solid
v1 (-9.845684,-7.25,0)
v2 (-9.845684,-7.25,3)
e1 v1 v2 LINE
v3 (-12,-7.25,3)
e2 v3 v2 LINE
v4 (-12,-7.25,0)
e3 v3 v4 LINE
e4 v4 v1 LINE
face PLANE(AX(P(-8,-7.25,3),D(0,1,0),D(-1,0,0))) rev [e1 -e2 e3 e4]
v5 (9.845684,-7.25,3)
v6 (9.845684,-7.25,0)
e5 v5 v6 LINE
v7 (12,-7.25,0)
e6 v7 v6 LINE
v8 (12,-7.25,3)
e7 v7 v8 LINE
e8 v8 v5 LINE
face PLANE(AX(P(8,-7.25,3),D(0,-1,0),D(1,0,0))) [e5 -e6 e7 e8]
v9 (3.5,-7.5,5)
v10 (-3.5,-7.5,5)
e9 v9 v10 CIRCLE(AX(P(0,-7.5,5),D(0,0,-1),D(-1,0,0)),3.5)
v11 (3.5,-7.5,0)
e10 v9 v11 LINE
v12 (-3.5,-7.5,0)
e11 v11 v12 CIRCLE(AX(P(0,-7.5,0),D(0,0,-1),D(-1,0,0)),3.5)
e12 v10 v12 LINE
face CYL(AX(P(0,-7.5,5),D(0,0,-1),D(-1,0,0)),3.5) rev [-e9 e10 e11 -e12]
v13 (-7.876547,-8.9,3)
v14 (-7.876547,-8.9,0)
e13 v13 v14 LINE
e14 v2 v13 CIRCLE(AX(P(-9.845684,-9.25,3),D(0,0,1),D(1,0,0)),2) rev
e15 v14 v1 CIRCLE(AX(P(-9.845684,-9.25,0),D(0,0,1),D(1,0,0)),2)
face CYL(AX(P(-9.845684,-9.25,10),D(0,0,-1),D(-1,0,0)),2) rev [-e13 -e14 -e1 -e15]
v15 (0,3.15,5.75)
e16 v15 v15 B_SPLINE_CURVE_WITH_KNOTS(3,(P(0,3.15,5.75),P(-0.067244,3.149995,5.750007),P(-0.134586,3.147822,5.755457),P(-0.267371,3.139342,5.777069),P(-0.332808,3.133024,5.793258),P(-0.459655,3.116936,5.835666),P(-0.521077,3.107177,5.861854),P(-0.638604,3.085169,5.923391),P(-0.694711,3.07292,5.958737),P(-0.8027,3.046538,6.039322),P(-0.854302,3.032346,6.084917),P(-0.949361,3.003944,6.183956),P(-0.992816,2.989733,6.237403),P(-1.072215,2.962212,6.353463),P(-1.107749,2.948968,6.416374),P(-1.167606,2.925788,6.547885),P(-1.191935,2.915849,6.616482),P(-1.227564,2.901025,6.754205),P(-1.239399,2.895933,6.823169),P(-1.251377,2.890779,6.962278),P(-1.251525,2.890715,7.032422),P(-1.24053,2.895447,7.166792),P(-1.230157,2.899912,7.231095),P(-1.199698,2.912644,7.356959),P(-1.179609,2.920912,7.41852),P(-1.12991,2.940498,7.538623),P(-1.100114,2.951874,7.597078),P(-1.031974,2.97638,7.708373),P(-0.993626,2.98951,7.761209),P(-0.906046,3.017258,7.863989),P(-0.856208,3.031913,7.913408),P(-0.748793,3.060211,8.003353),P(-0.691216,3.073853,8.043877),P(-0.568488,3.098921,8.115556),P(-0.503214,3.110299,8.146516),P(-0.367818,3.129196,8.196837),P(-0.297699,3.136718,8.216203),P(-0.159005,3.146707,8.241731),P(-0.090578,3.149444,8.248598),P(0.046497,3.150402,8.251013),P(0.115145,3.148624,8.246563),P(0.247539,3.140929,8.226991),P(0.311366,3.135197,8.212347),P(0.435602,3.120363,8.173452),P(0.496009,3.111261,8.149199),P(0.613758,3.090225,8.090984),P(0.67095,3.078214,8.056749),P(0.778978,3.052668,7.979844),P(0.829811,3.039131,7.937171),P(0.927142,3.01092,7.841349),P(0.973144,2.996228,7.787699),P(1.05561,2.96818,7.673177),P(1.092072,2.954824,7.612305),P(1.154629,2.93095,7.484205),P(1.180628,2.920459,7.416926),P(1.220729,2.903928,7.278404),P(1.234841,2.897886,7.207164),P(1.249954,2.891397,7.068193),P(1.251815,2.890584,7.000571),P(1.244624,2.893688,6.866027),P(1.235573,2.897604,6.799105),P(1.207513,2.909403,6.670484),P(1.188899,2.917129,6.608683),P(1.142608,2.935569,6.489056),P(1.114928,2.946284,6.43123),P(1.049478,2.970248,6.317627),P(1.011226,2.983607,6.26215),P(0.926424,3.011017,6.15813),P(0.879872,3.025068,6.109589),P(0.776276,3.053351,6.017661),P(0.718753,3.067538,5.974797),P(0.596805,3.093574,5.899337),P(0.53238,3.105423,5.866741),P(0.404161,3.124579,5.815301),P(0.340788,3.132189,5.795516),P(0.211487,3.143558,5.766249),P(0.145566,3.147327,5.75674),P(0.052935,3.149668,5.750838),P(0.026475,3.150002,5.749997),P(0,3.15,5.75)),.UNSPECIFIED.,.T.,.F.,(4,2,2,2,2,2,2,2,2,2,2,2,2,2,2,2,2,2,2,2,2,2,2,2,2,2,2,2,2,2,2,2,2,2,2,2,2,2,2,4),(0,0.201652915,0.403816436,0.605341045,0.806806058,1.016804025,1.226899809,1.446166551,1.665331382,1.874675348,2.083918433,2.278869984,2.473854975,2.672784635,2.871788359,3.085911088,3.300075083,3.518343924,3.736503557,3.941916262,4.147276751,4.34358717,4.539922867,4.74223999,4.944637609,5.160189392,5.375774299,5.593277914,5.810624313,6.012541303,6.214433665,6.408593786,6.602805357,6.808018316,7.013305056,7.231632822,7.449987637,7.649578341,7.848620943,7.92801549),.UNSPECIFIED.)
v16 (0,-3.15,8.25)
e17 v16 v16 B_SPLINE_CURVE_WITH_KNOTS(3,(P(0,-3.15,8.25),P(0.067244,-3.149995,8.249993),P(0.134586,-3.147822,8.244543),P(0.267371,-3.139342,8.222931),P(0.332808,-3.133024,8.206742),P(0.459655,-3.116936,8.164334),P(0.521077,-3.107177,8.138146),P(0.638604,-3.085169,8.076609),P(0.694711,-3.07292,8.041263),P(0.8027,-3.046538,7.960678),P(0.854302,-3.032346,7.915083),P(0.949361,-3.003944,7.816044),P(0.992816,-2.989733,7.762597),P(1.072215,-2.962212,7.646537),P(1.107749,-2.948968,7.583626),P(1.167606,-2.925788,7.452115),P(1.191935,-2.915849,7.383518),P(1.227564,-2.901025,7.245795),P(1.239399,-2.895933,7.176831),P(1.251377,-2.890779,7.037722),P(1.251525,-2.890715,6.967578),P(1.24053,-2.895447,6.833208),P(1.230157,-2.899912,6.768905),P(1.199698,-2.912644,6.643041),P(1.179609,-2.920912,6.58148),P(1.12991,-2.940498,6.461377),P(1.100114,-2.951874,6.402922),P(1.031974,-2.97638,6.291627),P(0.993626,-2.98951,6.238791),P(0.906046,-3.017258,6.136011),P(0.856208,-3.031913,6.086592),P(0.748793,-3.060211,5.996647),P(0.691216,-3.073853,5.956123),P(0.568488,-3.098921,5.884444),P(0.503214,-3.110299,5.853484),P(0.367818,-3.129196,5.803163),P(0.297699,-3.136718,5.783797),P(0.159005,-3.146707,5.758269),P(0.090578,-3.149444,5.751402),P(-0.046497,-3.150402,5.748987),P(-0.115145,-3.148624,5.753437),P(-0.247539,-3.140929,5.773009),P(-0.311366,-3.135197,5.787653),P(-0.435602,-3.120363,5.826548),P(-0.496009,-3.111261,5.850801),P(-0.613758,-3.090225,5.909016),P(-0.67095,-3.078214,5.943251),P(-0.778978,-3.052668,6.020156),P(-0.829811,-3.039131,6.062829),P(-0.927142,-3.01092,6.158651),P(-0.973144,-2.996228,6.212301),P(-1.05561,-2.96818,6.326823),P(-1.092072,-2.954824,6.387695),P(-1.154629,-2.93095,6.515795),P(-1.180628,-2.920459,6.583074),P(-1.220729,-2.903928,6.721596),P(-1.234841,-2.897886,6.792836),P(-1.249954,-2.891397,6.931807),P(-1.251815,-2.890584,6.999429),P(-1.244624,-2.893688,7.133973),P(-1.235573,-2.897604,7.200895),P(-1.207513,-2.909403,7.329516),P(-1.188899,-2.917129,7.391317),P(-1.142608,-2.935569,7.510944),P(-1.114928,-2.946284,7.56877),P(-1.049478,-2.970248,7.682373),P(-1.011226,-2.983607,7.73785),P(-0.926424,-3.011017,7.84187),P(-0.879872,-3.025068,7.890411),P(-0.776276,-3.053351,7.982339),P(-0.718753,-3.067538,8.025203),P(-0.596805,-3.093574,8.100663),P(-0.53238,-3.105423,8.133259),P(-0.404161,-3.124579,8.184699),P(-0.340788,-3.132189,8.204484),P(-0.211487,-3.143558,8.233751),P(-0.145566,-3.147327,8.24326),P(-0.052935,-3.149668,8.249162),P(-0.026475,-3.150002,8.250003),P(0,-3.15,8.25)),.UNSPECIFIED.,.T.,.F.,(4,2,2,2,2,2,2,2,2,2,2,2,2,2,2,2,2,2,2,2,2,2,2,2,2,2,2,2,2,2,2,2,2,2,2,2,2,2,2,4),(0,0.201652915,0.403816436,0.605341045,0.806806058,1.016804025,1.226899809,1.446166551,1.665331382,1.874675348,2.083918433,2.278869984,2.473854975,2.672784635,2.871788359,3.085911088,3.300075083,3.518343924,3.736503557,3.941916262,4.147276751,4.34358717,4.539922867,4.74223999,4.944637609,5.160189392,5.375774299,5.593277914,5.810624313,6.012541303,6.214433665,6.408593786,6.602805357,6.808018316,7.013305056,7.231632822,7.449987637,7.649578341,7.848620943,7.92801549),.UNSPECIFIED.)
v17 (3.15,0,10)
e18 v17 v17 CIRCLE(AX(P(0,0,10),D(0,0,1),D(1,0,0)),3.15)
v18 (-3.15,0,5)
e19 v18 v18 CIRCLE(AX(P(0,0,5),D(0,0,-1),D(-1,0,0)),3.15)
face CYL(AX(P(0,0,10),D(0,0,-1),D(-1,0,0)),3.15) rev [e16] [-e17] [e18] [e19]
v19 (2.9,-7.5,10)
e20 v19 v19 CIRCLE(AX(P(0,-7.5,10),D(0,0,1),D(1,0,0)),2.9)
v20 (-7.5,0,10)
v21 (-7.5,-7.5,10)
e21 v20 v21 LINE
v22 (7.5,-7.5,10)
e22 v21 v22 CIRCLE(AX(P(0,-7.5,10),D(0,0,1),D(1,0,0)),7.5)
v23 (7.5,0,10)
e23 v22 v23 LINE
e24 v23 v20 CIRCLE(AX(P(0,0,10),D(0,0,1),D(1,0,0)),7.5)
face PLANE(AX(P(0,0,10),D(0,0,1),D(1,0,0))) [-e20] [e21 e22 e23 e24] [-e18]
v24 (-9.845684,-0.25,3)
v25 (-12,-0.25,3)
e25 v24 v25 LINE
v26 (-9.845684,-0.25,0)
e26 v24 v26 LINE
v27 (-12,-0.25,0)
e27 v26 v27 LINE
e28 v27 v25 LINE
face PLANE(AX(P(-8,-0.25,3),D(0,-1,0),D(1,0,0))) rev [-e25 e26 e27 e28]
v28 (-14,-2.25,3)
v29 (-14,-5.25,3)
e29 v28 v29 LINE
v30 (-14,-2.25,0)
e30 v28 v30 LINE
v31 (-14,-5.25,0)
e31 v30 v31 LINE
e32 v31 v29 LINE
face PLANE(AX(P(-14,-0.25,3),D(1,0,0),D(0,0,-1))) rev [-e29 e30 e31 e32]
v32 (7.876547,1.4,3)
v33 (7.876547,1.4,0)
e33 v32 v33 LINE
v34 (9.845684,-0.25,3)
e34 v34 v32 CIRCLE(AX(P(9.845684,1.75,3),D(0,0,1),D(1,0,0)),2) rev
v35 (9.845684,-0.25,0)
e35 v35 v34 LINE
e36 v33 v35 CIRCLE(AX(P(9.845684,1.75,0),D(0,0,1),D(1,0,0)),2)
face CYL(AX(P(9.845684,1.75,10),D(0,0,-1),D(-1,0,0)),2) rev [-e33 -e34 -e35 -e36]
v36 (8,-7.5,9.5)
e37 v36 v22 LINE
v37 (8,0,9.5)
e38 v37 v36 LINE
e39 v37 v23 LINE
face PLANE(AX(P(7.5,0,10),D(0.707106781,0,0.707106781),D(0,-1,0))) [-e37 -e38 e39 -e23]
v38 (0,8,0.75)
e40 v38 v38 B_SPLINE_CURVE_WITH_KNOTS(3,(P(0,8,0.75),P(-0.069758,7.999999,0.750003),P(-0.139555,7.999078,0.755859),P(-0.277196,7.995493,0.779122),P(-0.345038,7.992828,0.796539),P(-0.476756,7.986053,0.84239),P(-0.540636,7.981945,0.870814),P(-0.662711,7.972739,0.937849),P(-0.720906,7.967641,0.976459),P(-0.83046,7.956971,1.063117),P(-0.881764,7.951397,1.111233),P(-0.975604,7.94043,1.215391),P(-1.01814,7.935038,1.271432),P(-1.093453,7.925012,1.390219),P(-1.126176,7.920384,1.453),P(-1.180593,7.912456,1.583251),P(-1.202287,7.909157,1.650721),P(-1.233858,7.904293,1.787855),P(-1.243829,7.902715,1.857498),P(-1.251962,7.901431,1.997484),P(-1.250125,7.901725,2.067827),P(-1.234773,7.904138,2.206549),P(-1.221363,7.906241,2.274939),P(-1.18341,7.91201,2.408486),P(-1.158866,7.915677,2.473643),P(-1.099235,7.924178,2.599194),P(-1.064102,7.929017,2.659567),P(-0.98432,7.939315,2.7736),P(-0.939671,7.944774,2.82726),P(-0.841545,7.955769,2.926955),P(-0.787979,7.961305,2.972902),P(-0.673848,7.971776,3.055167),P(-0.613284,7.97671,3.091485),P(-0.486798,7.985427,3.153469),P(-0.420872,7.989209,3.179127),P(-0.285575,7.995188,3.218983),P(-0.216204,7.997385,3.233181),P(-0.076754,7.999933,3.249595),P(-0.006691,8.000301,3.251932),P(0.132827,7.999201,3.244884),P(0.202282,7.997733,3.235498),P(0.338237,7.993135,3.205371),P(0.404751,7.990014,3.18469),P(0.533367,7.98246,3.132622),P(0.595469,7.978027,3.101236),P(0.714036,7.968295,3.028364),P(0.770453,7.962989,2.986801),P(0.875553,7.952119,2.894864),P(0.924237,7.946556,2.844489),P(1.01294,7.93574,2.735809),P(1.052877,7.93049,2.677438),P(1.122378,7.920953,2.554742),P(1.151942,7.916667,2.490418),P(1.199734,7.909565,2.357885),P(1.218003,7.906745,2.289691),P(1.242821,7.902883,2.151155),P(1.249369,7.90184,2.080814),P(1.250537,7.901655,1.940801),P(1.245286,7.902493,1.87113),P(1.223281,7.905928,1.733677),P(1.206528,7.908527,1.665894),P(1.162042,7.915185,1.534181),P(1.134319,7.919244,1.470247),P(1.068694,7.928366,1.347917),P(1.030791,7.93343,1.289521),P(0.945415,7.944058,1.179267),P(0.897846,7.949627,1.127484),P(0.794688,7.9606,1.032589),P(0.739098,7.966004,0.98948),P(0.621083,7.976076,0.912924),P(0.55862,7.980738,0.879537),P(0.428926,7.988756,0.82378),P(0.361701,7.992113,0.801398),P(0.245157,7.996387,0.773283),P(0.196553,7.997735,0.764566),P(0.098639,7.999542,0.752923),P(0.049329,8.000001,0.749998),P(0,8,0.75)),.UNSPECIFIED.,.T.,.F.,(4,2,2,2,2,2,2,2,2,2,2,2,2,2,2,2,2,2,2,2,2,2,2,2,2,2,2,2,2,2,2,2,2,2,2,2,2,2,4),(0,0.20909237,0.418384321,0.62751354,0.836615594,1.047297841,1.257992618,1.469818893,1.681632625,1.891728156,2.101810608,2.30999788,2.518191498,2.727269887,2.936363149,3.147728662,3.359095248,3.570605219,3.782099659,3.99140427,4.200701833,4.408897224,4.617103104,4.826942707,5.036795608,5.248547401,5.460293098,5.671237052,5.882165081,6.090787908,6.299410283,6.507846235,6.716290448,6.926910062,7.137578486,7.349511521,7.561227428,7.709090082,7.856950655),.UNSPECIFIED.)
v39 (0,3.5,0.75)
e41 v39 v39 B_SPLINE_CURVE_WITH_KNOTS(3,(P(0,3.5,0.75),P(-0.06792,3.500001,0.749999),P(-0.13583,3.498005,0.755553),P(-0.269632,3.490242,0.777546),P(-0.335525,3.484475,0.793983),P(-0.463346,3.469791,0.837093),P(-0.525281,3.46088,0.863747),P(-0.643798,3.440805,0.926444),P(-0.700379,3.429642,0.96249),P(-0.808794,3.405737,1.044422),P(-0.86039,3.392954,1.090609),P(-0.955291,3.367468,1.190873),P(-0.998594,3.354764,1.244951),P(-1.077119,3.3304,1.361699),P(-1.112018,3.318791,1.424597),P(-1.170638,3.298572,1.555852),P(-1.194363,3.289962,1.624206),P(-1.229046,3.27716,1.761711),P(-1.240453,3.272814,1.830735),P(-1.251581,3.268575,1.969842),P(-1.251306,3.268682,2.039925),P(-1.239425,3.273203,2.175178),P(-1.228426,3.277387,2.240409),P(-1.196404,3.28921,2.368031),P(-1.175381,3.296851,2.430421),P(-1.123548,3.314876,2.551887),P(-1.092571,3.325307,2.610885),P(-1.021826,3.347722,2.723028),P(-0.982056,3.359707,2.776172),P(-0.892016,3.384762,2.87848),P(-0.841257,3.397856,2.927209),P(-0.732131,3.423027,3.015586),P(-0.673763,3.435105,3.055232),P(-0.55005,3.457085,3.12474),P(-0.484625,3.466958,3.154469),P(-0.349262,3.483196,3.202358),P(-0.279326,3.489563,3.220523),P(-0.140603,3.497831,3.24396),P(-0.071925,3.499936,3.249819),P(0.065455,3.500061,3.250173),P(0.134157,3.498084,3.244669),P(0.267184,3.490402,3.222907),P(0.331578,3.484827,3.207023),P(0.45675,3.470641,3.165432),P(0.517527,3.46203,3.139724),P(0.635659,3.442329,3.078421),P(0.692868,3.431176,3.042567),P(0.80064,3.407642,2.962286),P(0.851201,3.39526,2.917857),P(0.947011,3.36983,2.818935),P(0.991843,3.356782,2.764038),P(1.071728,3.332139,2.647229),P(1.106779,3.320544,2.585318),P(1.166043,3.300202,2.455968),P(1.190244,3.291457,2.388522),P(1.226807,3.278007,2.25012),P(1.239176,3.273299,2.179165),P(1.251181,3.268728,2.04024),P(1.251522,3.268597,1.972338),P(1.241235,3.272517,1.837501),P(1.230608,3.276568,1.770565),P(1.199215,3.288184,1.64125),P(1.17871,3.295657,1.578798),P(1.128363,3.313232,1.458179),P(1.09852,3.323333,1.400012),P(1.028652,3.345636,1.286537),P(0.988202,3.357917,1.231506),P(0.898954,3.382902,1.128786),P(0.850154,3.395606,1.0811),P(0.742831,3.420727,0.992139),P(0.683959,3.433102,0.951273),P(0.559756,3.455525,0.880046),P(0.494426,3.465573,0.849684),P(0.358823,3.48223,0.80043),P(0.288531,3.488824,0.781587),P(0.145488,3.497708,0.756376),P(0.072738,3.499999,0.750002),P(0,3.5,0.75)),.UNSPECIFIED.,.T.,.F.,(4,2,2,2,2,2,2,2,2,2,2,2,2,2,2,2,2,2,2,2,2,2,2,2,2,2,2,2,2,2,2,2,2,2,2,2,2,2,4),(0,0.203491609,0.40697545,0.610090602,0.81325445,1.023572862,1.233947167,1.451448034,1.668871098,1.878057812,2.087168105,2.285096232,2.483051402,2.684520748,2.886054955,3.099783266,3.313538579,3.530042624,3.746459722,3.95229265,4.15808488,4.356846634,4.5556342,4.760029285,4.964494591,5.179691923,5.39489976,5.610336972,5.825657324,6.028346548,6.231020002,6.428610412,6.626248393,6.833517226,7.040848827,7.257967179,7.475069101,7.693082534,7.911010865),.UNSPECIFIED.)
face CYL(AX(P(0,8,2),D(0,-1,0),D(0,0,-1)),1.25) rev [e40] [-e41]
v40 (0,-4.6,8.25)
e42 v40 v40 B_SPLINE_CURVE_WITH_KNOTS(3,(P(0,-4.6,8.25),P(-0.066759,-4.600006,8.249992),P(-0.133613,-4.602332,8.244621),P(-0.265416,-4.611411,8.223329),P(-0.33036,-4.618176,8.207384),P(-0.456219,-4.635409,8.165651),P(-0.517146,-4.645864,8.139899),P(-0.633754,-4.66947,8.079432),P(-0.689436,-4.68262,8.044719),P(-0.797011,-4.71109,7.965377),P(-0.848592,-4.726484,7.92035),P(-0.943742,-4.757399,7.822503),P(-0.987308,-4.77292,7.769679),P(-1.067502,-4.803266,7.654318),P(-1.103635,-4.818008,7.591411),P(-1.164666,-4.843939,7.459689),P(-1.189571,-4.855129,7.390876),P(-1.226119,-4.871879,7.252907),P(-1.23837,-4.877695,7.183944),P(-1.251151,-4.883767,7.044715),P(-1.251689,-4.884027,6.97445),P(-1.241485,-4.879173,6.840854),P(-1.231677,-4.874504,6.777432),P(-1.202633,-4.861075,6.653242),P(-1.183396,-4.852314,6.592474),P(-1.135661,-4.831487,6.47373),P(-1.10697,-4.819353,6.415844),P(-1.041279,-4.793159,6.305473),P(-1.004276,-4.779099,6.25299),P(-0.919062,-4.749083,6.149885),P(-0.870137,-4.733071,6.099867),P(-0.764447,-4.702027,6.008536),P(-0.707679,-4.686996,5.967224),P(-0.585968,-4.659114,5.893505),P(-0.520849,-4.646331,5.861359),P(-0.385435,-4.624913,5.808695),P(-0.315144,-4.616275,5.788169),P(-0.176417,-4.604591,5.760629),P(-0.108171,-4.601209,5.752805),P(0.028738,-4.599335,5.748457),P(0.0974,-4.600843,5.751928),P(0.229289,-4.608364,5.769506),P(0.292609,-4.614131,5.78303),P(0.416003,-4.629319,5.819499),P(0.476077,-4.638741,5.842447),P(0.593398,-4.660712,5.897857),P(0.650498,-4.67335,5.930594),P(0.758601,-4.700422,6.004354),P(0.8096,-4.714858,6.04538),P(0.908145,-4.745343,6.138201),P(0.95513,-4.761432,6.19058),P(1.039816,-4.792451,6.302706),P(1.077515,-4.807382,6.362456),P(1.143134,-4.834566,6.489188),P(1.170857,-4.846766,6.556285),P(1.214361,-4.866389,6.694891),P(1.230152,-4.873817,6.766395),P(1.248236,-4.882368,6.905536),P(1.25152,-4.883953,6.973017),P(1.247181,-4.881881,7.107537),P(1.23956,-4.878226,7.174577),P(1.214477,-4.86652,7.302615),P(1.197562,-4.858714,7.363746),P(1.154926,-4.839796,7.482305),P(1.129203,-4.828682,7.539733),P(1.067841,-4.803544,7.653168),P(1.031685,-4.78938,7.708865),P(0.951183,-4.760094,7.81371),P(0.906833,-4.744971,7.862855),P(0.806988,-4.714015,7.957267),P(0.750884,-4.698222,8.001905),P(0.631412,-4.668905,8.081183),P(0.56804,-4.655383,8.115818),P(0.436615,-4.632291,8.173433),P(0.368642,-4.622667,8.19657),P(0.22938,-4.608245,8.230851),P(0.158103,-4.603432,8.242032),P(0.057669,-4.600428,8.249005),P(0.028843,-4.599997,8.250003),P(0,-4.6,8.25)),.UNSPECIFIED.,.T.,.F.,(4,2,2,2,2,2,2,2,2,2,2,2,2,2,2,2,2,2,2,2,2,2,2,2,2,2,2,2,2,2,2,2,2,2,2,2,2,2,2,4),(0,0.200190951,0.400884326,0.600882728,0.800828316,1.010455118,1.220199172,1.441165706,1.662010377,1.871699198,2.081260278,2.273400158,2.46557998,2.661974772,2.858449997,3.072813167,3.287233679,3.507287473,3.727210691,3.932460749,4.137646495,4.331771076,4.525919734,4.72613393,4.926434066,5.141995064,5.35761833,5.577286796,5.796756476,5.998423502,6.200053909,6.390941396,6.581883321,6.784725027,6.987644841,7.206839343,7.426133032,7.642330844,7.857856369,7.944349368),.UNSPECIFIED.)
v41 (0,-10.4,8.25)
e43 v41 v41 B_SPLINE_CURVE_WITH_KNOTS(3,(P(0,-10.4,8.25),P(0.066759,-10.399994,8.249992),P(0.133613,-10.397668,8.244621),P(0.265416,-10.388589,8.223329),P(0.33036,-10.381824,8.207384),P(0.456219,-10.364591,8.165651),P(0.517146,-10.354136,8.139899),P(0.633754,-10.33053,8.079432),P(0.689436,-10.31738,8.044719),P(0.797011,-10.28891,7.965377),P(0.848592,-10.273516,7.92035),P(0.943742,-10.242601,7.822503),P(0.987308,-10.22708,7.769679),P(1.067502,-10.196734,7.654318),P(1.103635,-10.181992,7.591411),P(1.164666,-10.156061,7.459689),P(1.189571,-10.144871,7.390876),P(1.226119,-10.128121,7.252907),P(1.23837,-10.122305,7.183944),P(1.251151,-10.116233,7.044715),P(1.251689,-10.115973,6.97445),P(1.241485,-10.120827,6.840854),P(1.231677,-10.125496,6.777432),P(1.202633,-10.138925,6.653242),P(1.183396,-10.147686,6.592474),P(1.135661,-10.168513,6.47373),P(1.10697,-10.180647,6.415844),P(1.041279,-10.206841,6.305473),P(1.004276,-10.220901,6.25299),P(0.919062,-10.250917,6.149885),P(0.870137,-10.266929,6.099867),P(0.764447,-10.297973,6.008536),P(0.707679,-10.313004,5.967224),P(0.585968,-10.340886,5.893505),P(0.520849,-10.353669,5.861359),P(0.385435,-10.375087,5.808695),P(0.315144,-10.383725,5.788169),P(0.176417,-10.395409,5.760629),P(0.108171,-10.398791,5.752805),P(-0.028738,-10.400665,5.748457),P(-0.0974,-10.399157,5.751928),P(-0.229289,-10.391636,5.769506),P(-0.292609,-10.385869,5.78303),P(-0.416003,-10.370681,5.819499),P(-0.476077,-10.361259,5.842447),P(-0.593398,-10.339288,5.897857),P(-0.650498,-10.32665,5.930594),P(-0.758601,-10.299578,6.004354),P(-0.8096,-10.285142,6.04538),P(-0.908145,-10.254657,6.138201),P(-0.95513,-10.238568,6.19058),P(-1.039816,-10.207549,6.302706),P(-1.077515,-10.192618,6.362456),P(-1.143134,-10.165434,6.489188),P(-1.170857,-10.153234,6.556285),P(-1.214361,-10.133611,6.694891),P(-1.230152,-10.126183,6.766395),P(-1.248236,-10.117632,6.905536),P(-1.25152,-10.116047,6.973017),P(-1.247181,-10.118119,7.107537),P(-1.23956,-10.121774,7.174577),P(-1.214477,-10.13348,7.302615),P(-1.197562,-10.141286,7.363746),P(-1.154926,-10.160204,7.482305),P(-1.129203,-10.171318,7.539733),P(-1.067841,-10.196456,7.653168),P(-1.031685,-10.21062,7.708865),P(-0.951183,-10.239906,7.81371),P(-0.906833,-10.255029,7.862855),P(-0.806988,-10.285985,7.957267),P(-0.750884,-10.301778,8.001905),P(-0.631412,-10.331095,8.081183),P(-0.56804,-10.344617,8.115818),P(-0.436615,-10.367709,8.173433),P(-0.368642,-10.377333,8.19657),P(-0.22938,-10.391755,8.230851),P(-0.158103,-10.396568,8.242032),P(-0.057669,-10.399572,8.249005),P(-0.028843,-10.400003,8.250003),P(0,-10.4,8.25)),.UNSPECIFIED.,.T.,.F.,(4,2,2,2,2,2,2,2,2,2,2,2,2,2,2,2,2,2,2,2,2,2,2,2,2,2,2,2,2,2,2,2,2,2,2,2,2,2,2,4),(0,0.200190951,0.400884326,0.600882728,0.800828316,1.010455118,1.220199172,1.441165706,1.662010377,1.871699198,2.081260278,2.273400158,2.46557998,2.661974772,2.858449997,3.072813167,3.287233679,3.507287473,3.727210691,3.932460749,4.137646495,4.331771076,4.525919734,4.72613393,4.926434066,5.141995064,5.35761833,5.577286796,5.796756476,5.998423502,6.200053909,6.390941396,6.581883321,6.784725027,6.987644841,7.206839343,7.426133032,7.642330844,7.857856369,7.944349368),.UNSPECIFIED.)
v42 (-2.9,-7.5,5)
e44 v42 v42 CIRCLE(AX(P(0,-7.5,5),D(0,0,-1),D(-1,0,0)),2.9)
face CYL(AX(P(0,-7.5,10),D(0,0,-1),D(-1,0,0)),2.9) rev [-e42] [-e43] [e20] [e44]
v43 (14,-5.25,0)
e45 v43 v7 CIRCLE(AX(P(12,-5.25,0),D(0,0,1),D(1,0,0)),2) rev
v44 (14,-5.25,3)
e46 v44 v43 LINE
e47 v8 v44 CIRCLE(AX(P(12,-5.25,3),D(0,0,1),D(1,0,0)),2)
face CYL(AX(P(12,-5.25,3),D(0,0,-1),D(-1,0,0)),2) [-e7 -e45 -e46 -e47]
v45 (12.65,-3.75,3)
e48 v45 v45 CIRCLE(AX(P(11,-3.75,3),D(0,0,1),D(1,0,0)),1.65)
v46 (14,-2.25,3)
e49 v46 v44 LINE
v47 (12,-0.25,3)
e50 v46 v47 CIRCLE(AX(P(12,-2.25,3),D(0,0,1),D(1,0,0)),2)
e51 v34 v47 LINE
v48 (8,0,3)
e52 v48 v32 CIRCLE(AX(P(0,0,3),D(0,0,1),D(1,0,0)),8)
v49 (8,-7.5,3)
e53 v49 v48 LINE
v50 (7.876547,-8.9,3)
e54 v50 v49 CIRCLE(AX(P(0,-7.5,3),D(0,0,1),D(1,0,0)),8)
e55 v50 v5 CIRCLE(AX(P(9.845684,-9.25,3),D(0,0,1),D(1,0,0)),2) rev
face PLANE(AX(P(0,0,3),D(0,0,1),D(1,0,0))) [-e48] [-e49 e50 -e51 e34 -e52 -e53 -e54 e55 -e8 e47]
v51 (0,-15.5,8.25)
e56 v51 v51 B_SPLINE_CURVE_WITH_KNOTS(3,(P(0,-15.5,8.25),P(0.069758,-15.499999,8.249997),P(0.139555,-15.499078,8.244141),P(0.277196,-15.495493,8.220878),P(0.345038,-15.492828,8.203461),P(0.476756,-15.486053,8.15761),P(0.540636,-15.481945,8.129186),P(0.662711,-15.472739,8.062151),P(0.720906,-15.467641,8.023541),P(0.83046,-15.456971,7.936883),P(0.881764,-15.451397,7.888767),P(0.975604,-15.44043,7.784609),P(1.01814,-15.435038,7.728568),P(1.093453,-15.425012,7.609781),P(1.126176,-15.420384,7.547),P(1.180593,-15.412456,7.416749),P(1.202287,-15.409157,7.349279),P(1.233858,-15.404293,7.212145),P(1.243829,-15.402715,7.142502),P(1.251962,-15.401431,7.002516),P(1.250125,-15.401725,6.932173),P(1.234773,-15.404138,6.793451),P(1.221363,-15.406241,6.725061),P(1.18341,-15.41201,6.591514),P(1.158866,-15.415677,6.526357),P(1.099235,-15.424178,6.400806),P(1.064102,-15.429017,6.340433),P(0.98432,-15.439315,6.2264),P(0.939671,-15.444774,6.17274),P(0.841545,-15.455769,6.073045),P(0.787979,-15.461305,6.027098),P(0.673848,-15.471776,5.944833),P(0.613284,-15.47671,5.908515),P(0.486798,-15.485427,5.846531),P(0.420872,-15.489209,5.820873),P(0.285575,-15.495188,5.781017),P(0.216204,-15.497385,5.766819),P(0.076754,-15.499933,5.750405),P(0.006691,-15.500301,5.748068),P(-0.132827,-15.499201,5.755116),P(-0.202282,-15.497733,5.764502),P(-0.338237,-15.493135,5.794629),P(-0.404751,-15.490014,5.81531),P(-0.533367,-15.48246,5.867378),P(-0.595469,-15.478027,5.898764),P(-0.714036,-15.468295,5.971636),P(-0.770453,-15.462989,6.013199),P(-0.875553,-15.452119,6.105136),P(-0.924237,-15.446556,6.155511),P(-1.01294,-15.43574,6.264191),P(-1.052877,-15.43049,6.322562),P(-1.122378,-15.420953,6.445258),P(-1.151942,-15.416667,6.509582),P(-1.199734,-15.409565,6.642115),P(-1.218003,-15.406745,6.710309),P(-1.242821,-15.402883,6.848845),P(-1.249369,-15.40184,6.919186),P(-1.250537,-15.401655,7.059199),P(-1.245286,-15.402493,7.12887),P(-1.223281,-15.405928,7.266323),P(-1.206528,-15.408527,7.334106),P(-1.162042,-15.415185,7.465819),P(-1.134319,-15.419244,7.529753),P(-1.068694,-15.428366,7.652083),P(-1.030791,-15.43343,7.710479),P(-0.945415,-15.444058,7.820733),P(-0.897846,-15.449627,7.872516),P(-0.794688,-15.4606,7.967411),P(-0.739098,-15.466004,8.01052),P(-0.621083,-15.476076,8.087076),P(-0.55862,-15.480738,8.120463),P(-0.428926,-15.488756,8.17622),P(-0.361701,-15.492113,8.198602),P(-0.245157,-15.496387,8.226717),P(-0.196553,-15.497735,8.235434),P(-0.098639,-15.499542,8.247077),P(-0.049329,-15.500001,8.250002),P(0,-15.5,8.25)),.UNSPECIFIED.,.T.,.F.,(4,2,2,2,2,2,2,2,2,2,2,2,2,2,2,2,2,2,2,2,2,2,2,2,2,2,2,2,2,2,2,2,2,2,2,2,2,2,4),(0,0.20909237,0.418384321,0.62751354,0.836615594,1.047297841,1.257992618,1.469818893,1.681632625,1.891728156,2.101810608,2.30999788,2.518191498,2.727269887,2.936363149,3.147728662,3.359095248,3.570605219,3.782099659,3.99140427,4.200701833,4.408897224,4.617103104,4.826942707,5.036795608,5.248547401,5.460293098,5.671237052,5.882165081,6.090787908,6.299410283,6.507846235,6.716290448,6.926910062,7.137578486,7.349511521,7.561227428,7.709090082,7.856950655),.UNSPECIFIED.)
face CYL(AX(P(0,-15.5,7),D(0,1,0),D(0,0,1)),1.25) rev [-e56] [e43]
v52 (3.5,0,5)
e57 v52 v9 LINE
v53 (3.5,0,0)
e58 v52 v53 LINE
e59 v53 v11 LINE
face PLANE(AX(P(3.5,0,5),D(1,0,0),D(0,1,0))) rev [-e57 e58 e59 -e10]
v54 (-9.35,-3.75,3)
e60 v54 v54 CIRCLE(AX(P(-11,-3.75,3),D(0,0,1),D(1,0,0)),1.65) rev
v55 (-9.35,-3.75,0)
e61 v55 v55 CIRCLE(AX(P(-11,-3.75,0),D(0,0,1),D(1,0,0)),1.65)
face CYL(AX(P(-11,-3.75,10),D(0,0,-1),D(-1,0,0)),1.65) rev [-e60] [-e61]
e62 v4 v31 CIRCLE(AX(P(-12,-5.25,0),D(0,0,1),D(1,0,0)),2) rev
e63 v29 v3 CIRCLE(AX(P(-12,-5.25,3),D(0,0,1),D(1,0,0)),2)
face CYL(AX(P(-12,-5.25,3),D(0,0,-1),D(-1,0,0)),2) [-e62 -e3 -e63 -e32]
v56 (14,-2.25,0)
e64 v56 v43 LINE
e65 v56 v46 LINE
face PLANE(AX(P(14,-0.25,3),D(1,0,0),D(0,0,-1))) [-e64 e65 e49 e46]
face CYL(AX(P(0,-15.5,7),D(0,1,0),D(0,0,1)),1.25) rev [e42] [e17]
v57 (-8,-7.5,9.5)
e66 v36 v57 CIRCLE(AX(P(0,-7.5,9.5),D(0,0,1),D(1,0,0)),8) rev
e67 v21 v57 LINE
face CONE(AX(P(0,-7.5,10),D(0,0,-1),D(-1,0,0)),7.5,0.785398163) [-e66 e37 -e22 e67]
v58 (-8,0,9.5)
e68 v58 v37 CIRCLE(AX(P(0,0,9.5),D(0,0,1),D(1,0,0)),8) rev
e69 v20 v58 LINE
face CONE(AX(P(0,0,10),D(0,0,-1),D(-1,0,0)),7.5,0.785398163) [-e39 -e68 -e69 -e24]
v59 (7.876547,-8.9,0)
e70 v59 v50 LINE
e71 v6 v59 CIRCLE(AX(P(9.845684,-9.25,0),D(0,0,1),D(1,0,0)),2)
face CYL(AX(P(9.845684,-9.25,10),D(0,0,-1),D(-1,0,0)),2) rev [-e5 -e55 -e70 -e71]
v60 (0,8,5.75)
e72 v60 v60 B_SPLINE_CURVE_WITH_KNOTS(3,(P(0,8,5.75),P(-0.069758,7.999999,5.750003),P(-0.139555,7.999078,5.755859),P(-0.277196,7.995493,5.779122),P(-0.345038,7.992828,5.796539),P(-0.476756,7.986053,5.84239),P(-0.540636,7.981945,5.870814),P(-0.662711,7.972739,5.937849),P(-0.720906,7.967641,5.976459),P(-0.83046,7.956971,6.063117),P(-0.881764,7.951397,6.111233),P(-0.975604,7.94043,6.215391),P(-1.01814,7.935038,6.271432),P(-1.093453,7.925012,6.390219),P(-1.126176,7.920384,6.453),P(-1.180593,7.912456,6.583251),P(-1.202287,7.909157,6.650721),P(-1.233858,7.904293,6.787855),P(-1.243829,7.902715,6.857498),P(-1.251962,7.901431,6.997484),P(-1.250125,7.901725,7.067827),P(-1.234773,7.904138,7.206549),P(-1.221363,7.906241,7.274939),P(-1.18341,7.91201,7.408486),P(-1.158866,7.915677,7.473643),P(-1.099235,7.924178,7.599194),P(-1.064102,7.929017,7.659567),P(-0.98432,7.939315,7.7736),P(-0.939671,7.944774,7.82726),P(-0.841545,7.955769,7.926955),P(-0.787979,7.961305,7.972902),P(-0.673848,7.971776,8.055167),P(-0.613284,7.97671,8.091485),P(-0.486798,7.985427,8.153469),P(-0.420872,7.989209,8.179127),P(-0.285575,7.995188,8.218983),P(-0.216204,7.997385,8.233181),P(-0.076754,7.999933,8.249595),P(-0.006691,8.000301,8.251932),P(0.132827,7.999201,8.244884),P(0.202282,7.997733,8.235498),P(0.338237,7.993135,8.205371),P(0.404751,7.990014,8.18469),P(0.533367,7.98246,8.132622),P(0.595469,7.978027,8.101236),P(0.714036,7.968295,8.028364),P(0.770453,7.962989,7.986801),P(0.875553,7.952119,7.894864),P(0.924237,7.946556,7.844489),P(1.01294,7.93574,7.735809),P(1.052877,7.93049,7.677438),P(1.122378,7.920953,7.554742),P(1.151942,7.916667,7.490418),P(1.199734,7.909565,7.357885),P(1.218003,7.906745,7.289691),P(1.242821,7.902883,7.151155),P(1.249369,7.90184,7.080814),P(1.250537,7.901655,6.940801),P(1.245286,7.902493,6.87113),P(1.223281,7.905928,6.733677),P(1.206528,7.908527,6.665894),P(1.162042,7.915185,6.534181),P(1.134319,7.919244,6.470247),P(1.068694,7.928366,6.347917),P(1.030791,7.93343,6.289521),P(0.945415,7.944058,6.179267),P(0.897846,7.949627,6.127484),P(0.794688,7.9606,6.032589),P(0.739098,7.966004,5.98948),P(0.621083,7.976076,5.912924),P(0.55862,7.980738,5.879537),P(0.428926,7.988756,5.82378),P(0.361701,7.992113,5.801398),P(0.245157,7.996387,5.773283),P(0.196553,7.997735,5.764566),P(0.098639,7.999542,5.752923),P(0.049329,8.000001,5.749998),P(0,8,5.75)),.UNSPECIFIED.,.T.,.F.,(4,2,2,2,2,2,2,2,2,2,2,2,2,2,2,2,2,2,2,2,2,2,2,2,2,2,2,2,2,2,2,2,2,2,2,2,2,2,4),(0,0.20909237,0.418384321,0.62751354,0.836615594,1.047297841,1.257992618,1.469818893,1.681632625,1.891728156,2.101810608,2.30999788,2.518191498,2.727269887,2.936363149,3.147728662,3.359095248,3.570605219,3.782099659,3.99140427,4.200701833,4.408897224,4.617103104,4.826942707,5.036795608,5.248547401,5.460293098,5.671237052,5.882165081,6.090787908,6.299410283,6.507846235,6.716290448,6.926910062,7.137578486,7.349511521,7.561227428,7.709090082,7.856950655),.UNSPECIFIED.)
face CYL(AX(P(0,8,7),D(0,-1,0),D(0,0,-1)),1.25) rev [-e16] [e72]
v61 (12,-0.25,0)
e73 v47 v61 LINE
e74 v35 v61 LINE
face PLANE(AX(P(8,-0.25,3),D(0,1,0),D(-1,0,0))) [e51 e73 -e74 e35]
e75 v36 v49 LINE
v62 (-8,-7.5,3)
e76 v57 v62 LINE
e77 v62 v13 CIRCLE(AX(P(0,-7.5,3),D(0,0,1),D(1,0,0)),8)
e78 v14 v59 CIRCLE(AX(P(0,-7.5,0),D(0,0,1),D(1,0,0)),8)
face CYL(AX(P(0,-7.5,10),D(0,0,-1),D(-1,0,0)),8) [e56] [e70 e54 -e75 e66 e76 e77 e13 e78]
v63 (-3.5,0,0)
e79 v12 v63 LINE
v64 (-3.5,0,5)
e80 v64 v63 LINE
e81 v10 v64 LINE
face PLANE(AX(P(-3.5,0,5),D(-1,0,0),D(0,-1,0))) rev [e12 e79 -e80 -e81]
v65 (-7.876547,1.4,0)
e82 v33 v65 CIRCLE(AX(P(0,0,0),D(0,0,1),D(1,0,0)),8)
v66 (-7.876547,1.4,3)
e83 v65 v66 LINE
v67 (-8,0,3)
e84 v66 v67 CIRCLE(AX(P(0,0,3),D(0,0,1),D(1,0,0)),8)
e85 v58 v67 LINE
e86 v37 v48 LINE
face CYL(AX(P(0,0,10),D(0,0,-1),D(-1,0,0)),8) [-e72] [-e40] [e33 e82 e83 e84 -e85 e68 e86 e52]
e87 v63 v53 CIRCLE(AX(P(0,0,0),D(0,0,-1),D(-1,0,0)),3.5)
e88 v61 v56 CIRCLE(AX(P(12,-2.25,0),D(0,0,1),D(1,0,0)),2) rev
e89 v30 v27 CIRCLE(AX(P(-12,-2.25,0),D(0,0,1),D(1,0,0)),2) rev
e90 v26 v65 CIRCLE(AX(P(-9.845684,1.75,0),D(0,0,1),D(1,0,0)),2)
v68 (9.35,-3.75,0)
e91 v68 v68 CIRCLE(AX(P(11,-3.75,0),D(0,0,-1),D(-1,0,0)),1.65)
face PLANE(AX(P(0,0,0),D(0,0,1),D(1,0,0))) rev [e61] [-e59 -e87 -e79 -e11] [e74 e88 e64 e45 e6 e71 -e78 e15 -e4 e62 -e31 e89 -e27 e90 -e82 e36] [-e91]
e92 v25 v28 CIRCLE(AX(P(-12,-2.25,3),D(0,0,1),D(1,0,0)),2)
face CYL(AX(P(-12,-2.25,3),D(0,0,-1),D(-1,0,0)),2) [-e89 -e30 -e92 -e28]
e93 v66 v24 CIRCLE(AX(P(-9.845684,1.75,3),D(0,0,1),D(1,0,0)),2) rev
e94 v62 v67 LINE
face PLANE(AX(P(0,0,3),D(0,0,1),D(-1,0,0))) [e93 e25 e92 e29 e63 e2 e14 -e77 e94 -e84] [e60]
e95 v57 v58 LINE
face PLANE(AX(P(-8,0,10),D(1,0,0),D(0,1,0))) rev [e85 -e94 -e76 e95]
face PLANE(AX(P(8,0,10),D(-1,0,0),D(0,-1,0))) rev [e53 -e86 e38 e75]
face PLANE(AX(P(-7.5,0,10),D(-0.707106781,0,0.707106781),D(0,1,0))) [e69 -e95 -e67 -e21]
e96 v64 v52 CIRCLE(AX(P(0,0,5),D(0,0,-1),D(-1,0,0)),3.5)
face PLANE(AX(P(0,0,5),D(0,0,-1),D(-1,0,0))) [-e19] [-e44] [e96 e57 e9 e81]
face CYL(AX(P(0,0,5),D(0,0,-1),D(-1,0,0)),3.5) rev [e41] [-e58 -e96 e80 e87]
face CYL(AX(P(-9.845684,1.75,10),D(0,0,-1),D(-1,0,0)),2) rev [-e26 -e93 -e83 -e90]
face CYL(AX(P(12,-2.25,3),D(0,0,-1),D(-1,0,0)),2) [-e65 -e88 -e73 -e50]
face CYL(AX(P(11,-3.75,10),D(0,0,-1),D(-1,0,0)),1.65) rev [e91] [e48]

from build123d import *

# Parameters (mm, degrees)
SKETCH1_R            = 3.15
SKETCH1_R_2          = 2.9
BOSS_EXTRUDE1_DEPTH  = 10
SKETCH2_R            = 1.25
CUT_EXTRUDE1_DEPTH   = 21.105969263
CHAMFER1_SIZE        = 0.5
SKETCH3_R            = 1.25
CUT_EXTRUDE2_DEPTH   = 21.105969352
SKETCH4_W            = 6
SKETCH4_H            = 7
BOSS_EXTRUDE2_DEPTH  = 3
SKETCH5_R            = 1.65
CUT_EXTRUDE3_DEPTH   = 24.157072484
FILLET1_R            = 2
FILLET1_OF_MIRROR1_R = 2
FILLET2_R            = 2
CUT_EXTRUDE4_DEPTH   = 5


with BuildPart() as part:
    # Sketch1 → Boss-Extrude1 (new body)
    with BuildSketch(Plane.XY):
        with BuildLine():
            Line((8, 0), (8, -7.5))
            ThreePointArc((8, -7.5), (0, -15.5), (-8, -7.5))
            Line((-8, -7.5), (-8, 0))
            ThreePointArc((-8, 0), (0, 8), (8, 0))
        make_face()
        Circle(SKETCH1_R, mode=Mode.SUBTRACT)
        with Locations((0, -7.5)):
            Circle(SKETCH1_R_2, mode=Mode.SUBTRACT)
    extrude(amount=BOSS_EXTRUDE1_DEPTH)

    # Sketch2 → Cut-Extrude1 (cut, through all)
    with BuildSketch(Plane(origin=(0, 0, 0), x_dir=(1, 0, 0), z_dir=(0, 1, 0))):
        with Locations(Location((0, -2, 0), (0, 0, 90))):
            Circle(SKETCH2_R)
        with Locations(Location((0, -7, 0), (0, 0, 90))):
            Circle(SKETCH2_R)
    extrude(amount=CUT_EXTRUDE1_DEPTH, mode=Mode.SUBTRACT)

    # Chamfer1
    chamfer1_edges = [part.edges().sort_by_distance(p)[0] for p in [
        (0, -15.5, 10),
        (8, -3.75, 10),
        (0, 8, 10),
        (-8, -3.75, 10),
    ]]
    chamfer(chamfer1_edges, length=CHAMFER1_SIZE)

    # Sketch3 → Cut-Extrude2 (cut, through all)
    with BuildSketch(Plane(origin=(0, 0, 0), x_dir=(1, 0, 0), z_dir=(0, 1, 0))):
        with Locations(Location((0, -7, 0), (0, 0, 90))):
            Circle(SKETCH3_R)
    extrude(amount=-CUT_EXTRUDE2_DEPTH, mode=Mode.SUBTRACT)

    # Sketch4 → Boss-Extrude2 (add)
    with BuildSketch(Plane(origin=(0, 0, 0), x_dir=(-1, 0, 0), z_dir=(0, 0, -1))):
        with Locations((-11, -3.75)):
            Rectangle(SKETCH4_W, SKETCH4_H)
    boss_extrude2 = extrude(amount=-BOSS_EXTRUDE2_DEPTH)

    # Sketch5 → Cut-Extrude3 (cut, through all)
    with BuildSketch(Plane(origin=(0, 0, 0), x_dir=(-1, 0, 0), z_dir=(0, 0, -1))):
        with Locations((-11, -3.75)):
            Circle(SKETCH5_R)
    cut_extrude3 = extrude(amount=-CUT_EXTRUDE3_DEPTH, mode=Mode.SUBTRACT)

    # Fillet1
    fillet1_edges = [part.edges().sort_by_distance(p)[0] for p in [
        (14, -7.25, 1.5),
        (14, -0.25, 1.5),
    ]]
    fillet(fillet1_edges, radius=FILLET1_R)

    # Mirror1: Boss-Extrude2, Cut-Extrude3 across plane
    add(boss_extrude2.mirror(Plane(origin=(0, 0, 0), x_dir=(0, 0, 1), z_dir=(1, 0, 0))))
    add(cut_extrude3.mirror(Plane(origin=(0, 0, 0), x_dir=(0, 0, 1), z_dir=(1, 0, 0))), mode=Mode.SUBTRACT)

    # Fillet1 of Mirror1
    fillet1_of_mirror1_edges = [part.edges().sort_by_distance(p)[0] for p in [
        (-14, -7.25, 1.5),
        (-14, -0.25, 1.5),
    ]]
    fillet(fillet1_of_mirror1_edges, radius=FILLET1_OF_MIRROR1_R)

    # Fillet2
    # the kernel refuses this fillet: 2 mm, written as the material it adds along each edge
    with BuildSketch(Plane(origin=(-8, -0.25, 0), x_dir=(-1, 0, 0), z_dir=(0, 0, 1))) as fillet2_piece_1:
        with BuildLine():
            CenterArc((1.845684334, -2), FILLET2_R, 90, 79.921341892)
            Line((-0.123452533, -1.65), (-0.32036622, -1.615))
            ThreePointArc((-0.32036622, -1.615), (-0.2, -0.25), (-0.2, 0))
            Line((-0.2, 0), (0, 0.2))
            Line((0, 0.2), (1.845684334, 0.2))
            Line((1.845684334, 0.2), (1.845684334, 0))
        make_face()
    extrude(amount=3)
    with BuildSketch(Plane(origin=(-8, -7.25, 0), x_dir=(0.07461117211724091, -0.9972127019825267, 0), z_dir=(0, 0, 1)), Plane(origin=(8, -0.25, 0), x_dir=(-0.07461117211724083, 0.9972127019825267, 0), z_dir=(0, 0, 1))) as fillet2_piece_2:
        with BuildLine():
            CenterArc((1.856716732, -1.989762206), FILLET2_R, 95.799776596, 79.921341892)
            Line((-0.137708672, -1.840539861), (-0.337151212, -1.825617627))
            Line((-0.337151212, -1.825617627), (-0.19944254, 0.014922234))
            Line((-0.19944254, 0.014922234), (0.014922234, 0.19944254))
            ThreePointArc((0.014922234, 0.19944254), (0.26422541, 0.180789747), (1.634401413, 0.198976221))
            Line((1.634401413, 0.198976221), (1.654611896, 0))
        make_face()
    extrude(amount=3)
    with BuildSketch(Plane(origin=(8, -7.25, 0), x_dir=(-0.07461117211724076, -0.9972127019825267, 0), z_dir=(0, 0, 1))) as fillet2_piece_3:
        with BuildLine():
            CenterArc((1.856716732, 1.989762206), FILLET2_R, 184.278881512, 79.921341892)
            Line((-0.137708672, 1.840539861), (-0.337151212, 1.825617627))
            Line((-0.337151212, 1.825617627), (-0.19944254, -0.014922234))
            Line((-0.19944254, -0.014922234), (0.014922234, -0.19944254))
            ThreePointArc((0.014922234, -0.19944254), (0.26422541, -0.180789747), (1.634401413, -0.198976221))
            Line((1.634401413, -0.198976221), (1.654611896, 0))
        make_face()
    extrude(amount=3)

    # Sketch6 → Cut-Extrude4 (cut)
    with BuildSketch(Plane(origin=(0, 0, 0), x_dir=(-1, 0, 0), z_dir=(0, 0, -1))):
        with BuildLine():
            Line((3.5, 0), (3.5, -7.5))
            ThreePointArc((3.5, -7.5), (0, -11), (-3.5, -7.5))
            Line((-3.5, -7.5), (-3.5, 0))
            ThreePointArc((-3.5, 0), (0, 3.5), (3.5, 0))
        make_face()
    extrude(amount=-CUT_EXTRUDE4_DEPTH, mode=Mode.SUBTRACT)


solid = part.part
